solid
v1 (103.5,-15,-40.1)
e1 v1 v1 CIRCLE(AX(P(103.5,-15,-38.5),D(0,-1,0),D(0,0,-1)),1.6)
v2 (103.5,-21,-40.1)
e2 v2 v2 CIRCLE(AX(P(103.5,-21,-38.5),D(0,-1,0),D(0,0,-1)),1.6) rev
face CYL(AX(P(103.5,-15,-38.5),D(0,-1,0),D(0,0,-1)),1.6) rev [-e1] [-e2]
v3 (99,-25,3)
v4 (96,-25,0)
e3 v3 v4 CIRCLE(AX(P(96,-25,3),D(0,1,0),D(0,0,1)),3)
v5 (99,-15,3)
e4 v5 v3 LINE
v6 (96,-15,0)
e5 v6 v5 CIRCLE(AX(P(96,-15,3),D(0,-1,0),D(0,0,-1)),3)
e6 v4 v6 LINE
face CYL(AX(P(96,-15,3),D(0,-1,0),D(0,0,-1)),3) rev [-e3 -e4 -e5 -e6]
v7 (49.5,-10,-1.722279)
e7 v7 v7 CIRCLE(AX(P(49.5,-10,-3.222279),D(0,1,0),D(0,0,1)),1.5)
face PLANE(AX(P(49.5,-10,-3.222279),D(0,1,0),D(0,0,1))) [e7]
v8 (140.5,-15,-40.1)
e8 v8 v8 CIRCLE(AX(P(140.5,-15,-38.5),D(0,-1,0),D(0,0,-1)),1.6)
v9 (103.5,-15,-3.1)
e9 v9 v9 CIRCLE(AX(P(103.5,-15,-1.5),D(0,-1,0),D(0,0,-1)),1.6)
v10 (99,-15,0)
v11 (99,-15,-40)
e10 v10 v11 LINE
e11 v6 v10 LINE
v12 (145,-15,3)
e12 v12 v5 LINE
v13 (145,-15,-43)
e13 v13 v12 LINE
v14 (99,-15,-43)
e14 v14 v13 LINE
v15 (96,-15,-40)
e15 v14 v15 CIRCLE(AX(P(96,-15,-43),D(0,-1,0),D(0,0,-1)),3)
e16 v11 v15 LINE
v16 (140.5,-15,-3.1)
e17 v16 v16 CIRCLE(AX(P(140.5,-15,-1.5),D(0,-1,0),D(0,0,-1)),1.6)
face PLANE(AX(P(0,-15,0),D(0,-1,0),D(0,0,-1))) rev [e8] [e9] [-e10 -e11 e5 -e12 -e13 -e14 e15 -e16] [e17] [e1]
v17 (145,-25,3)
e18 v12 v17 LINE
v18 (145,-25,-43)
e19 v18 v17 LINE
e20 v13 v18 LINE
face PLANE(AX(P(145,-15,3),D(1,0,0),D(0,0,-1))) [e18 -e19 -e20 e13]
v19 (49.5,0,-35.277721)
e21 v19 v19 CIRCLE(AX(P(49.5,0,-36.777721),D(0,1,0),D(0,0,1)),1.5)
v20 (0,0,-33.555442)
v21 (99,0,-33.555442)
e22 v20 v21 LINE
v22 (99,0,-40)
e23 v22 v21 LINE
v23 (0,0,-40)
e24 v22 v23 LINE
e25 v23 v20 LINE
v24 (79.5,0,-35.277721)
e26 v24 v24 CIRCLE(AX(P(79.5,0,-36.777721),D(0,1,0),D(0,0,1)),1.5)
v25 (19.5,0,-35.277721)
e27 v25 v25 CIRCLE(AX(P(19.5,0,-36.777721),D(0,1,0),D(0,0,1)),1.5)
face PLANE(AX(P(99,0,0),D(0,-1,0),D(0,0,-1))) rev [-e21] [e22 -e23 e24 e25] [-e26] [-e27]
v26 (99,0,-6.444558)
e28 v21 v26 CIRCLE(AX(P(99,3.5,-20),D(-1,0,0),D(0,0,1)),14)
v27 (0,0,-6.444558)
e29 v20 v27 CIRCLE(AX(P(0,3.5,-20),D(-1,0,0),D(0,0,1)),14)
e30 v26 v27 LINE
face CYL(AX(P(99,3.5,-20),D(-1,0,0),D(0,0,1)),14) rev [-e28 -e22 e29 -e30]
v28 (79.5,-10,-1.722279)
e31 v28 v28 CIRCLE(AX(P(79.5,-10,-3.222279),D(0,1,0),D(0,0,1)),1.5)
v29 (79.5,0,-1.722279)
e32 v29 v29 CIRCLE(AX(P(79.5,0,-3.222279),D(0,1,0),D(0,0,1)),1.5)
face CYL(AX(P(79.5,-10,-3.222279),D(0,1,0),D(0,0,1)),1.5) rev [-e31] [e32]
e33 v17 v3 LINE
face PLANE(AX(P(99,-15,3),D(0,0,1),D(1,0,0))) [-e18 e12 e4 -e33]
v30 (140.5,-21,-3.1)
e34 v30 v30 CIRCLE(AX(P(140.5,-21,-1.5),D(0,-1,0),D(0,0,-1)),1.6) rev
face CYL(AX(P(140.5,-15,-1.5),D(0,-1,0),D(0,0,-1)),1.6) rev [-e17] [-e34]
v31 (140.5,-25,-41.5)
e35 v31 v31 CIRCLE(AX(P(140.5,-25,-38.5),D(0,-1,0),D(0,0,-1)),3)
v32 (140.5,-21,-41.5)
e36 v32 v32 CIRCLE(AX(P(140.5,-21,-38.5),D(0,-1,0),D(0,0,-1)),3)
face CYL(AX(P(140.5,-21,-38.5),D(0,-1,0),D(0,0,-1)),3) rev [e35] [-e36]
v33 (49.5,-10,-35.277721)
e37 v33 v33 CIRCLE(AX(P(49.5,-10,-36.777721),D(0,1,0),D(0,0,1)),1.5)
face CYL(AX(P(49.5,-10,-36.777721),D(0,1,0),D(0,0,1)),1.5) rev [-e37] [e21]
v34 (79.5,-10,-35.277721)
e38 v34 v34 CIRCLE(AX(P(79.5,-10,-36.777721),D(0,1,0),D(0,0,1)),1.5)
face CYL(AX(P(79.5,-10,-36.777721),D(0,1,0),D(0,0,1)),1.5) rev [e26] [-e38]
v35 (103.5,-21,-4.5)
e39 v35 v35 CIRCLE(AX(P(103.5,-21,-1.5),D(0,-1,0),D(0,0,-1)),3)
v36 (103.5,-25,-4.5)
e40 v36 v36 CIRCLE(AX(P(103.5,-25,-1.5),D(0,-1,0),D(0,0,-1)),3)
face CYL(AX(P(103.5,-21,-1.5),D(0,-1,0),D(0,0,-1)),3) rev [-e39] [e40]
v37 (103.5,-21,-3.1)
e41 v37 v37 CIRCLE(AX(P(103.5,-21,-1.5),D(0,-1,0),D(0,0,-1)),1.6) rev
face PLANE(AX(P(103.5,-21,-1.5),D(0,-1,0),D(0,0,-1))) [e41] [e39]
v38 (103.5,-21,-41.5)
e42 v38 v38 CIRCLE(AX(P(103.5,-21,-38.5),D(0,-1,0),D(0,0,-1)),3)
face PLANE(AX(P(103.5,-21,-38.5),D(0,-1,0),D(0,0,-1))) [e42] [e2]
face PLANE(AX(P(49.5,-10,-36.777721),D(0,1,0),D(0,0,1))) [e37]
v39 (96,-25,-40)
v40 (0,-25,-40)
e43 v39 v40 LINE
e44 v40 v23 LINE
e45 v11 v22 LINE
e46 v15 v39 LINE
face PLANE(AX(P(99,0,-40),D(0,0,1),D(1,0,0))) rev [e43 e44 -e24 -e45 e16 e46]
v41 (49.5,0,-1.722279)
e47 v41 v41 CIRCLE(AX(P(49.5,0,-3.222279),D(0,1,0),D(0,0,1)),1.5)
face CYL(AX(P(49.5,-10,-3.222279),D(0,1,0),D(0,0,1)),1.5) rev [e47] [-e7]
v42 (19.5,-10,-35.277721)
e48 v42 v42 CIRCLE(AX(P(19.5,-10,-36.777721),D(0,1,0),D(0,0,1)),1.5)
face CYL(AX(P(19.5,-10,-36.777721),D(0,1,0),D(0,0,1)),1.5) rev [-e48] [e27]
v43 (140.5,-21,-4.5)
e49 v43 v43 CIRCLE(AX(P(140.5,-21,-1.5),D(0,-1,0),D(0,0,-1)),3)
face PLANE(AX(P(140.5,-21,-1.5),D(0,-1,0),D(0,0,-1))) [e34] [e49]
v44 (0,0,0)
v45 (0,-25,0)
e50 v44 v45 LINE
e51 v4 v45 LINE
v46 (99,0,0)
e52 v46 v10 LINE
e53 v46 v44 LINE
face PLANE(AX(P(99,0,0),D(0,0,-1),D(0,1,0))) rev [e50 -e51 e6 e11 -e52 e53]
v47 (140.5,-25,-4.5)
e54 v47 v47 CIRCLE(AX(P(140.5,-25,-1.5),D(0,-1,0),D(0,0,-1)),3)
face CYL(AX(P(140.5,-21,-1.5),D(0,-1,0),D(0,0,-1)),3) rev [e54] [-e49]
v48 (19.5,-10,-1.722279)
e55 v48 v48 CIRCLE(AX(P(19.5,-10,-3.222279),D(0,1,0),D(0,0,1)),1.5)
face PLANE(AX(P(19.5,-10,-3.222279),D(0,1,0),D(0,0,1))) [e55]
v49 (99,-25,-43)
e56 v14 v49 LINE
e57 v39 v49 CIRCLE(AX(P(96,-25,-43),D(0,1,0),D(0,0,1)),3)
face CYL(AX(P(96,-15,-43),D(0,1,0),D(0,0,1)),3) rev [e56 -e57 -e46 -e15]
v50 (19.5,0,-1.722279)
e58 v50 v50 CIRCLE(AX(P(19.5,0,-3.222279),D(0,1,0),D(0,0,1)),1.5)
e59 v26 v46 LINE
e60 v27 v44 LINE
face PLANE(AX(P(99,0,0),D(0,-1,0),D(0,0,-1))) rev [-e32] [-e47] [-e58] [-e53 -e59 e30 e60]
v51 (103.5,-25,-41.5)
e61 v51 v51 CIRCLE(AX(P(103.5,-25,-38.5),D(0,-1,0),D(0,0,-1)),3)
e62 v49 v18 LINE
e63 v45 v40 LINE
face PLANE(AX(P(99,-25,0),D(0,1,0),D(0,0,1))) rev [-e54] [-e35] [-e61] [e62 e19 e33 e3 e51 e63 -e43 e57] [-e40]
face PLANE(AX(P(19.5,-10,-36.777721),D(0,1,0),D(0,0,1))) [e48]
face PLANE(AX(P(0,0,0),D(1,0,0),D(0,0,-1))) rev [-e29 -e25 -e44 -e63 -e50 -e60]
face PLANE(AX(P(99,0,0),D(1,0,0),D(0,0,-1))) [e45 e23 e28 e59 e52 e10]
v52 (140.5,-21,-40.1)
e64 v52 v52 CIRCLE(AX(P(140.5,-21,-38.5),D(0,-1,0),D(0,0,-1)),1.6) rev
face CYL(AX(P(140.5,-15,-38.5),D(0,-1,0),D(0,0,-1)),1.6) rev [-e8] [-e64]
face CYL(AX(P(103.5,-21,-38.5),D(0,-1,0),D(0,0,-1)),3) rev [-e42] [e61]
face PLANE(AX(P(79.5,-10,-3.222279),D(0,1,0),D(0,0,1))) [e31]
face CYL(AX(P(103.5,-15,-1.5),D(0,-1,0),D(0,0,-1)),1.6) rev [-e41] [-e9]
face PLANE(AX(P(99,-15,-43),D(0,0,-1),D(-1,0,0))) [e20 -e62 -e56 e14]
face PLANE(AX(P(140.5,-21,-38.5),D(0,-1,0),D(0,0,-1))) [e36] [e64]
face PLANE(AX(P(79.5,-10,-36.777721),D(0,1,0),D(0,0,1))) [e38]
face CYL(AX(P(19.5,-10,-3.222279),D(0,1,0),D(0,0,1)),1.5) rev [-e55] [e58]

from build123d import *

# Parameters (mm, degrees)
SKETCH_1_W          = 40
SKETCH_1_H          = 25
EXTRUDE_1_DEPTH     = 99
SKETCH_2_R          = 14
CUT_EXTRUDE_1_DEPTH = 110.66312051
SKETCH_3_W          = 46
SKETCH_3_H          = 46
EXTRUDE_2_DEPTH     = 10
SKETCH_4_R          = 1.6
CUT_EXTRUDE_2_DEPTH = 10
SKETCH_5_R          = 3
CUT_EXTRUDE_3_DEPTH = 4
FILLET_1_R          = 3
SKETCH_6_R          = 1.5
CUT_EXTRUDE_4_DEPTH = 10


with BuildPart() as part:
    # 草图1 → 凸台-拉伸1 (new body)
    with BuildSketch(Plane(origin=(0, 0, 0), x_dir=(0, 0, -1), z_dir=(1, 0, 0))):
        with Locations((20, -12.5)):
            Rectangle(SKETCH_1_W, SKETCH_1_H)
    extrude(amount=EXTRUDE_1_DEPTH)

    # 草图2 → 切除-拉伸1 (cut, through all)
    with BuildSketch(Plane.ZY):
        with Locations((-20, 3.5)):
            Circle(SKETCH_2_R)
    extrude(amount=-CUT_EXTRUDE_1_DEPTH, mode=Mode.SUBTRACT)

    # 草图3 → 凸台-拉伸2 (add)
    with BuildSketch(Plane(origin=(0, -25, 0), x_dir=(-1, 0, 0), z_dir=(0, -1, 0))):
        with Locations((-122, 20)):
            Rectangle(SKETCH_3_W, SKETCH_3_H)
    extrude(amount=-EXTRUDE_2_DEPTH)

    # 草图4 → 切除-拉伸2 (cut)
    with BuildSketch(Plane(origin=(0, -25, 0), x_dir=(-1, 0, 0), z_dir=(0, -1, 0))):
        with Locations(Location((-103.5, 1.5, 0), (0, 0, 90))):
            Circle(SKETCH_4_R)
        with Locations(Location((-140.5, 1.5, 0), (0, 0, 90))):
            Circle(SKETCH_4_R)
        with Locations(Location((-103.5, 38.5, 0), (0, 0, 90))):
            Circle(SKETCH_4_R)
        with Locations(Location((-140.5, 38.5, 0), (0, 0, 90))):
            Circle(SKETCH_4_R)
    extrude(amount=-CUT_EXTRUDE_2_DEPTH, mode=Mode.SUBTRACT)

    # 草图5 → 切除-拉伸3 (cut)
    with BuildSketch(Plane(origin=(0, -25, 0), x_dir=(-1, 0, 0), z_dir=(0, -1, 0))):
        with Locations(Location((-103.5, 1.5, 0), (0, 0, 90))):
            Circle(SKETCH_5_R)
        with Locations(Location((-103.5, 38.5, 0), (0, 0, 90))):
            Circle(SKETCH_5_R)
        with Locations(Location((-140.5, 38.5, 0), (0, 0, 90))):
            Circle(SKETCH_5_R)
        with Locations(Location((-140.5, 1.5, 0), (0, 0, 90))):
            Circle(SKETCH_5_R)
    extrude(amount=-CUT_EXTRUDE_3_DEPTH, mode=Mode.SUBTRACT)

    # 圆角1
    fillet_1_edges = [part.edges().sort_by_distance(p)[0] for p in [
        (99, -20, -40),
        (99, -20, 0),
    ]]
    fillet(fillet_1_edges, radius=FILLET_1_R - 0.0001)  # a hair under: the kernel refuses the full size

    # 草图6 → 切除-拉伸4 (cut)
    with BuildSketch(Plane(origin=(0, 0, 0), x_dir=(1, 0, 0), z_dir=(0, 1, 0))):
        with Locations(Location((49.5, 36.777720856, 0), (0, 0, 270))):
            Circle(SKETCH_6_R)
        with Locations(Location((49.5, 3.222279144, 0), (0, 0, 270))):
            Circle(SKETCH_6_R)
        with Locations(Location((19.5, 36.777720856, 0), (0, 0, 270))):
            Circle(SKETCH_6_R)
        with Locations(Location((19.5, 3.222279144, 0), (0, 0, 270))):
            Circle(SKETCH_6_R)
        with Locations(Location((79.5, 36.777720856, 0), (0, 0, 270))):
            Circle(SKETCH_6_R)
        with Locations(Location((79.5, 3.222279144, 0), (0, 0, 270))):
            Circle(SKETCH_6_R)
    extrude(amount=-CUT_EXTRUDE_4_DEPTH, mode=Mode.SUBTRACT)


solid = part.part
